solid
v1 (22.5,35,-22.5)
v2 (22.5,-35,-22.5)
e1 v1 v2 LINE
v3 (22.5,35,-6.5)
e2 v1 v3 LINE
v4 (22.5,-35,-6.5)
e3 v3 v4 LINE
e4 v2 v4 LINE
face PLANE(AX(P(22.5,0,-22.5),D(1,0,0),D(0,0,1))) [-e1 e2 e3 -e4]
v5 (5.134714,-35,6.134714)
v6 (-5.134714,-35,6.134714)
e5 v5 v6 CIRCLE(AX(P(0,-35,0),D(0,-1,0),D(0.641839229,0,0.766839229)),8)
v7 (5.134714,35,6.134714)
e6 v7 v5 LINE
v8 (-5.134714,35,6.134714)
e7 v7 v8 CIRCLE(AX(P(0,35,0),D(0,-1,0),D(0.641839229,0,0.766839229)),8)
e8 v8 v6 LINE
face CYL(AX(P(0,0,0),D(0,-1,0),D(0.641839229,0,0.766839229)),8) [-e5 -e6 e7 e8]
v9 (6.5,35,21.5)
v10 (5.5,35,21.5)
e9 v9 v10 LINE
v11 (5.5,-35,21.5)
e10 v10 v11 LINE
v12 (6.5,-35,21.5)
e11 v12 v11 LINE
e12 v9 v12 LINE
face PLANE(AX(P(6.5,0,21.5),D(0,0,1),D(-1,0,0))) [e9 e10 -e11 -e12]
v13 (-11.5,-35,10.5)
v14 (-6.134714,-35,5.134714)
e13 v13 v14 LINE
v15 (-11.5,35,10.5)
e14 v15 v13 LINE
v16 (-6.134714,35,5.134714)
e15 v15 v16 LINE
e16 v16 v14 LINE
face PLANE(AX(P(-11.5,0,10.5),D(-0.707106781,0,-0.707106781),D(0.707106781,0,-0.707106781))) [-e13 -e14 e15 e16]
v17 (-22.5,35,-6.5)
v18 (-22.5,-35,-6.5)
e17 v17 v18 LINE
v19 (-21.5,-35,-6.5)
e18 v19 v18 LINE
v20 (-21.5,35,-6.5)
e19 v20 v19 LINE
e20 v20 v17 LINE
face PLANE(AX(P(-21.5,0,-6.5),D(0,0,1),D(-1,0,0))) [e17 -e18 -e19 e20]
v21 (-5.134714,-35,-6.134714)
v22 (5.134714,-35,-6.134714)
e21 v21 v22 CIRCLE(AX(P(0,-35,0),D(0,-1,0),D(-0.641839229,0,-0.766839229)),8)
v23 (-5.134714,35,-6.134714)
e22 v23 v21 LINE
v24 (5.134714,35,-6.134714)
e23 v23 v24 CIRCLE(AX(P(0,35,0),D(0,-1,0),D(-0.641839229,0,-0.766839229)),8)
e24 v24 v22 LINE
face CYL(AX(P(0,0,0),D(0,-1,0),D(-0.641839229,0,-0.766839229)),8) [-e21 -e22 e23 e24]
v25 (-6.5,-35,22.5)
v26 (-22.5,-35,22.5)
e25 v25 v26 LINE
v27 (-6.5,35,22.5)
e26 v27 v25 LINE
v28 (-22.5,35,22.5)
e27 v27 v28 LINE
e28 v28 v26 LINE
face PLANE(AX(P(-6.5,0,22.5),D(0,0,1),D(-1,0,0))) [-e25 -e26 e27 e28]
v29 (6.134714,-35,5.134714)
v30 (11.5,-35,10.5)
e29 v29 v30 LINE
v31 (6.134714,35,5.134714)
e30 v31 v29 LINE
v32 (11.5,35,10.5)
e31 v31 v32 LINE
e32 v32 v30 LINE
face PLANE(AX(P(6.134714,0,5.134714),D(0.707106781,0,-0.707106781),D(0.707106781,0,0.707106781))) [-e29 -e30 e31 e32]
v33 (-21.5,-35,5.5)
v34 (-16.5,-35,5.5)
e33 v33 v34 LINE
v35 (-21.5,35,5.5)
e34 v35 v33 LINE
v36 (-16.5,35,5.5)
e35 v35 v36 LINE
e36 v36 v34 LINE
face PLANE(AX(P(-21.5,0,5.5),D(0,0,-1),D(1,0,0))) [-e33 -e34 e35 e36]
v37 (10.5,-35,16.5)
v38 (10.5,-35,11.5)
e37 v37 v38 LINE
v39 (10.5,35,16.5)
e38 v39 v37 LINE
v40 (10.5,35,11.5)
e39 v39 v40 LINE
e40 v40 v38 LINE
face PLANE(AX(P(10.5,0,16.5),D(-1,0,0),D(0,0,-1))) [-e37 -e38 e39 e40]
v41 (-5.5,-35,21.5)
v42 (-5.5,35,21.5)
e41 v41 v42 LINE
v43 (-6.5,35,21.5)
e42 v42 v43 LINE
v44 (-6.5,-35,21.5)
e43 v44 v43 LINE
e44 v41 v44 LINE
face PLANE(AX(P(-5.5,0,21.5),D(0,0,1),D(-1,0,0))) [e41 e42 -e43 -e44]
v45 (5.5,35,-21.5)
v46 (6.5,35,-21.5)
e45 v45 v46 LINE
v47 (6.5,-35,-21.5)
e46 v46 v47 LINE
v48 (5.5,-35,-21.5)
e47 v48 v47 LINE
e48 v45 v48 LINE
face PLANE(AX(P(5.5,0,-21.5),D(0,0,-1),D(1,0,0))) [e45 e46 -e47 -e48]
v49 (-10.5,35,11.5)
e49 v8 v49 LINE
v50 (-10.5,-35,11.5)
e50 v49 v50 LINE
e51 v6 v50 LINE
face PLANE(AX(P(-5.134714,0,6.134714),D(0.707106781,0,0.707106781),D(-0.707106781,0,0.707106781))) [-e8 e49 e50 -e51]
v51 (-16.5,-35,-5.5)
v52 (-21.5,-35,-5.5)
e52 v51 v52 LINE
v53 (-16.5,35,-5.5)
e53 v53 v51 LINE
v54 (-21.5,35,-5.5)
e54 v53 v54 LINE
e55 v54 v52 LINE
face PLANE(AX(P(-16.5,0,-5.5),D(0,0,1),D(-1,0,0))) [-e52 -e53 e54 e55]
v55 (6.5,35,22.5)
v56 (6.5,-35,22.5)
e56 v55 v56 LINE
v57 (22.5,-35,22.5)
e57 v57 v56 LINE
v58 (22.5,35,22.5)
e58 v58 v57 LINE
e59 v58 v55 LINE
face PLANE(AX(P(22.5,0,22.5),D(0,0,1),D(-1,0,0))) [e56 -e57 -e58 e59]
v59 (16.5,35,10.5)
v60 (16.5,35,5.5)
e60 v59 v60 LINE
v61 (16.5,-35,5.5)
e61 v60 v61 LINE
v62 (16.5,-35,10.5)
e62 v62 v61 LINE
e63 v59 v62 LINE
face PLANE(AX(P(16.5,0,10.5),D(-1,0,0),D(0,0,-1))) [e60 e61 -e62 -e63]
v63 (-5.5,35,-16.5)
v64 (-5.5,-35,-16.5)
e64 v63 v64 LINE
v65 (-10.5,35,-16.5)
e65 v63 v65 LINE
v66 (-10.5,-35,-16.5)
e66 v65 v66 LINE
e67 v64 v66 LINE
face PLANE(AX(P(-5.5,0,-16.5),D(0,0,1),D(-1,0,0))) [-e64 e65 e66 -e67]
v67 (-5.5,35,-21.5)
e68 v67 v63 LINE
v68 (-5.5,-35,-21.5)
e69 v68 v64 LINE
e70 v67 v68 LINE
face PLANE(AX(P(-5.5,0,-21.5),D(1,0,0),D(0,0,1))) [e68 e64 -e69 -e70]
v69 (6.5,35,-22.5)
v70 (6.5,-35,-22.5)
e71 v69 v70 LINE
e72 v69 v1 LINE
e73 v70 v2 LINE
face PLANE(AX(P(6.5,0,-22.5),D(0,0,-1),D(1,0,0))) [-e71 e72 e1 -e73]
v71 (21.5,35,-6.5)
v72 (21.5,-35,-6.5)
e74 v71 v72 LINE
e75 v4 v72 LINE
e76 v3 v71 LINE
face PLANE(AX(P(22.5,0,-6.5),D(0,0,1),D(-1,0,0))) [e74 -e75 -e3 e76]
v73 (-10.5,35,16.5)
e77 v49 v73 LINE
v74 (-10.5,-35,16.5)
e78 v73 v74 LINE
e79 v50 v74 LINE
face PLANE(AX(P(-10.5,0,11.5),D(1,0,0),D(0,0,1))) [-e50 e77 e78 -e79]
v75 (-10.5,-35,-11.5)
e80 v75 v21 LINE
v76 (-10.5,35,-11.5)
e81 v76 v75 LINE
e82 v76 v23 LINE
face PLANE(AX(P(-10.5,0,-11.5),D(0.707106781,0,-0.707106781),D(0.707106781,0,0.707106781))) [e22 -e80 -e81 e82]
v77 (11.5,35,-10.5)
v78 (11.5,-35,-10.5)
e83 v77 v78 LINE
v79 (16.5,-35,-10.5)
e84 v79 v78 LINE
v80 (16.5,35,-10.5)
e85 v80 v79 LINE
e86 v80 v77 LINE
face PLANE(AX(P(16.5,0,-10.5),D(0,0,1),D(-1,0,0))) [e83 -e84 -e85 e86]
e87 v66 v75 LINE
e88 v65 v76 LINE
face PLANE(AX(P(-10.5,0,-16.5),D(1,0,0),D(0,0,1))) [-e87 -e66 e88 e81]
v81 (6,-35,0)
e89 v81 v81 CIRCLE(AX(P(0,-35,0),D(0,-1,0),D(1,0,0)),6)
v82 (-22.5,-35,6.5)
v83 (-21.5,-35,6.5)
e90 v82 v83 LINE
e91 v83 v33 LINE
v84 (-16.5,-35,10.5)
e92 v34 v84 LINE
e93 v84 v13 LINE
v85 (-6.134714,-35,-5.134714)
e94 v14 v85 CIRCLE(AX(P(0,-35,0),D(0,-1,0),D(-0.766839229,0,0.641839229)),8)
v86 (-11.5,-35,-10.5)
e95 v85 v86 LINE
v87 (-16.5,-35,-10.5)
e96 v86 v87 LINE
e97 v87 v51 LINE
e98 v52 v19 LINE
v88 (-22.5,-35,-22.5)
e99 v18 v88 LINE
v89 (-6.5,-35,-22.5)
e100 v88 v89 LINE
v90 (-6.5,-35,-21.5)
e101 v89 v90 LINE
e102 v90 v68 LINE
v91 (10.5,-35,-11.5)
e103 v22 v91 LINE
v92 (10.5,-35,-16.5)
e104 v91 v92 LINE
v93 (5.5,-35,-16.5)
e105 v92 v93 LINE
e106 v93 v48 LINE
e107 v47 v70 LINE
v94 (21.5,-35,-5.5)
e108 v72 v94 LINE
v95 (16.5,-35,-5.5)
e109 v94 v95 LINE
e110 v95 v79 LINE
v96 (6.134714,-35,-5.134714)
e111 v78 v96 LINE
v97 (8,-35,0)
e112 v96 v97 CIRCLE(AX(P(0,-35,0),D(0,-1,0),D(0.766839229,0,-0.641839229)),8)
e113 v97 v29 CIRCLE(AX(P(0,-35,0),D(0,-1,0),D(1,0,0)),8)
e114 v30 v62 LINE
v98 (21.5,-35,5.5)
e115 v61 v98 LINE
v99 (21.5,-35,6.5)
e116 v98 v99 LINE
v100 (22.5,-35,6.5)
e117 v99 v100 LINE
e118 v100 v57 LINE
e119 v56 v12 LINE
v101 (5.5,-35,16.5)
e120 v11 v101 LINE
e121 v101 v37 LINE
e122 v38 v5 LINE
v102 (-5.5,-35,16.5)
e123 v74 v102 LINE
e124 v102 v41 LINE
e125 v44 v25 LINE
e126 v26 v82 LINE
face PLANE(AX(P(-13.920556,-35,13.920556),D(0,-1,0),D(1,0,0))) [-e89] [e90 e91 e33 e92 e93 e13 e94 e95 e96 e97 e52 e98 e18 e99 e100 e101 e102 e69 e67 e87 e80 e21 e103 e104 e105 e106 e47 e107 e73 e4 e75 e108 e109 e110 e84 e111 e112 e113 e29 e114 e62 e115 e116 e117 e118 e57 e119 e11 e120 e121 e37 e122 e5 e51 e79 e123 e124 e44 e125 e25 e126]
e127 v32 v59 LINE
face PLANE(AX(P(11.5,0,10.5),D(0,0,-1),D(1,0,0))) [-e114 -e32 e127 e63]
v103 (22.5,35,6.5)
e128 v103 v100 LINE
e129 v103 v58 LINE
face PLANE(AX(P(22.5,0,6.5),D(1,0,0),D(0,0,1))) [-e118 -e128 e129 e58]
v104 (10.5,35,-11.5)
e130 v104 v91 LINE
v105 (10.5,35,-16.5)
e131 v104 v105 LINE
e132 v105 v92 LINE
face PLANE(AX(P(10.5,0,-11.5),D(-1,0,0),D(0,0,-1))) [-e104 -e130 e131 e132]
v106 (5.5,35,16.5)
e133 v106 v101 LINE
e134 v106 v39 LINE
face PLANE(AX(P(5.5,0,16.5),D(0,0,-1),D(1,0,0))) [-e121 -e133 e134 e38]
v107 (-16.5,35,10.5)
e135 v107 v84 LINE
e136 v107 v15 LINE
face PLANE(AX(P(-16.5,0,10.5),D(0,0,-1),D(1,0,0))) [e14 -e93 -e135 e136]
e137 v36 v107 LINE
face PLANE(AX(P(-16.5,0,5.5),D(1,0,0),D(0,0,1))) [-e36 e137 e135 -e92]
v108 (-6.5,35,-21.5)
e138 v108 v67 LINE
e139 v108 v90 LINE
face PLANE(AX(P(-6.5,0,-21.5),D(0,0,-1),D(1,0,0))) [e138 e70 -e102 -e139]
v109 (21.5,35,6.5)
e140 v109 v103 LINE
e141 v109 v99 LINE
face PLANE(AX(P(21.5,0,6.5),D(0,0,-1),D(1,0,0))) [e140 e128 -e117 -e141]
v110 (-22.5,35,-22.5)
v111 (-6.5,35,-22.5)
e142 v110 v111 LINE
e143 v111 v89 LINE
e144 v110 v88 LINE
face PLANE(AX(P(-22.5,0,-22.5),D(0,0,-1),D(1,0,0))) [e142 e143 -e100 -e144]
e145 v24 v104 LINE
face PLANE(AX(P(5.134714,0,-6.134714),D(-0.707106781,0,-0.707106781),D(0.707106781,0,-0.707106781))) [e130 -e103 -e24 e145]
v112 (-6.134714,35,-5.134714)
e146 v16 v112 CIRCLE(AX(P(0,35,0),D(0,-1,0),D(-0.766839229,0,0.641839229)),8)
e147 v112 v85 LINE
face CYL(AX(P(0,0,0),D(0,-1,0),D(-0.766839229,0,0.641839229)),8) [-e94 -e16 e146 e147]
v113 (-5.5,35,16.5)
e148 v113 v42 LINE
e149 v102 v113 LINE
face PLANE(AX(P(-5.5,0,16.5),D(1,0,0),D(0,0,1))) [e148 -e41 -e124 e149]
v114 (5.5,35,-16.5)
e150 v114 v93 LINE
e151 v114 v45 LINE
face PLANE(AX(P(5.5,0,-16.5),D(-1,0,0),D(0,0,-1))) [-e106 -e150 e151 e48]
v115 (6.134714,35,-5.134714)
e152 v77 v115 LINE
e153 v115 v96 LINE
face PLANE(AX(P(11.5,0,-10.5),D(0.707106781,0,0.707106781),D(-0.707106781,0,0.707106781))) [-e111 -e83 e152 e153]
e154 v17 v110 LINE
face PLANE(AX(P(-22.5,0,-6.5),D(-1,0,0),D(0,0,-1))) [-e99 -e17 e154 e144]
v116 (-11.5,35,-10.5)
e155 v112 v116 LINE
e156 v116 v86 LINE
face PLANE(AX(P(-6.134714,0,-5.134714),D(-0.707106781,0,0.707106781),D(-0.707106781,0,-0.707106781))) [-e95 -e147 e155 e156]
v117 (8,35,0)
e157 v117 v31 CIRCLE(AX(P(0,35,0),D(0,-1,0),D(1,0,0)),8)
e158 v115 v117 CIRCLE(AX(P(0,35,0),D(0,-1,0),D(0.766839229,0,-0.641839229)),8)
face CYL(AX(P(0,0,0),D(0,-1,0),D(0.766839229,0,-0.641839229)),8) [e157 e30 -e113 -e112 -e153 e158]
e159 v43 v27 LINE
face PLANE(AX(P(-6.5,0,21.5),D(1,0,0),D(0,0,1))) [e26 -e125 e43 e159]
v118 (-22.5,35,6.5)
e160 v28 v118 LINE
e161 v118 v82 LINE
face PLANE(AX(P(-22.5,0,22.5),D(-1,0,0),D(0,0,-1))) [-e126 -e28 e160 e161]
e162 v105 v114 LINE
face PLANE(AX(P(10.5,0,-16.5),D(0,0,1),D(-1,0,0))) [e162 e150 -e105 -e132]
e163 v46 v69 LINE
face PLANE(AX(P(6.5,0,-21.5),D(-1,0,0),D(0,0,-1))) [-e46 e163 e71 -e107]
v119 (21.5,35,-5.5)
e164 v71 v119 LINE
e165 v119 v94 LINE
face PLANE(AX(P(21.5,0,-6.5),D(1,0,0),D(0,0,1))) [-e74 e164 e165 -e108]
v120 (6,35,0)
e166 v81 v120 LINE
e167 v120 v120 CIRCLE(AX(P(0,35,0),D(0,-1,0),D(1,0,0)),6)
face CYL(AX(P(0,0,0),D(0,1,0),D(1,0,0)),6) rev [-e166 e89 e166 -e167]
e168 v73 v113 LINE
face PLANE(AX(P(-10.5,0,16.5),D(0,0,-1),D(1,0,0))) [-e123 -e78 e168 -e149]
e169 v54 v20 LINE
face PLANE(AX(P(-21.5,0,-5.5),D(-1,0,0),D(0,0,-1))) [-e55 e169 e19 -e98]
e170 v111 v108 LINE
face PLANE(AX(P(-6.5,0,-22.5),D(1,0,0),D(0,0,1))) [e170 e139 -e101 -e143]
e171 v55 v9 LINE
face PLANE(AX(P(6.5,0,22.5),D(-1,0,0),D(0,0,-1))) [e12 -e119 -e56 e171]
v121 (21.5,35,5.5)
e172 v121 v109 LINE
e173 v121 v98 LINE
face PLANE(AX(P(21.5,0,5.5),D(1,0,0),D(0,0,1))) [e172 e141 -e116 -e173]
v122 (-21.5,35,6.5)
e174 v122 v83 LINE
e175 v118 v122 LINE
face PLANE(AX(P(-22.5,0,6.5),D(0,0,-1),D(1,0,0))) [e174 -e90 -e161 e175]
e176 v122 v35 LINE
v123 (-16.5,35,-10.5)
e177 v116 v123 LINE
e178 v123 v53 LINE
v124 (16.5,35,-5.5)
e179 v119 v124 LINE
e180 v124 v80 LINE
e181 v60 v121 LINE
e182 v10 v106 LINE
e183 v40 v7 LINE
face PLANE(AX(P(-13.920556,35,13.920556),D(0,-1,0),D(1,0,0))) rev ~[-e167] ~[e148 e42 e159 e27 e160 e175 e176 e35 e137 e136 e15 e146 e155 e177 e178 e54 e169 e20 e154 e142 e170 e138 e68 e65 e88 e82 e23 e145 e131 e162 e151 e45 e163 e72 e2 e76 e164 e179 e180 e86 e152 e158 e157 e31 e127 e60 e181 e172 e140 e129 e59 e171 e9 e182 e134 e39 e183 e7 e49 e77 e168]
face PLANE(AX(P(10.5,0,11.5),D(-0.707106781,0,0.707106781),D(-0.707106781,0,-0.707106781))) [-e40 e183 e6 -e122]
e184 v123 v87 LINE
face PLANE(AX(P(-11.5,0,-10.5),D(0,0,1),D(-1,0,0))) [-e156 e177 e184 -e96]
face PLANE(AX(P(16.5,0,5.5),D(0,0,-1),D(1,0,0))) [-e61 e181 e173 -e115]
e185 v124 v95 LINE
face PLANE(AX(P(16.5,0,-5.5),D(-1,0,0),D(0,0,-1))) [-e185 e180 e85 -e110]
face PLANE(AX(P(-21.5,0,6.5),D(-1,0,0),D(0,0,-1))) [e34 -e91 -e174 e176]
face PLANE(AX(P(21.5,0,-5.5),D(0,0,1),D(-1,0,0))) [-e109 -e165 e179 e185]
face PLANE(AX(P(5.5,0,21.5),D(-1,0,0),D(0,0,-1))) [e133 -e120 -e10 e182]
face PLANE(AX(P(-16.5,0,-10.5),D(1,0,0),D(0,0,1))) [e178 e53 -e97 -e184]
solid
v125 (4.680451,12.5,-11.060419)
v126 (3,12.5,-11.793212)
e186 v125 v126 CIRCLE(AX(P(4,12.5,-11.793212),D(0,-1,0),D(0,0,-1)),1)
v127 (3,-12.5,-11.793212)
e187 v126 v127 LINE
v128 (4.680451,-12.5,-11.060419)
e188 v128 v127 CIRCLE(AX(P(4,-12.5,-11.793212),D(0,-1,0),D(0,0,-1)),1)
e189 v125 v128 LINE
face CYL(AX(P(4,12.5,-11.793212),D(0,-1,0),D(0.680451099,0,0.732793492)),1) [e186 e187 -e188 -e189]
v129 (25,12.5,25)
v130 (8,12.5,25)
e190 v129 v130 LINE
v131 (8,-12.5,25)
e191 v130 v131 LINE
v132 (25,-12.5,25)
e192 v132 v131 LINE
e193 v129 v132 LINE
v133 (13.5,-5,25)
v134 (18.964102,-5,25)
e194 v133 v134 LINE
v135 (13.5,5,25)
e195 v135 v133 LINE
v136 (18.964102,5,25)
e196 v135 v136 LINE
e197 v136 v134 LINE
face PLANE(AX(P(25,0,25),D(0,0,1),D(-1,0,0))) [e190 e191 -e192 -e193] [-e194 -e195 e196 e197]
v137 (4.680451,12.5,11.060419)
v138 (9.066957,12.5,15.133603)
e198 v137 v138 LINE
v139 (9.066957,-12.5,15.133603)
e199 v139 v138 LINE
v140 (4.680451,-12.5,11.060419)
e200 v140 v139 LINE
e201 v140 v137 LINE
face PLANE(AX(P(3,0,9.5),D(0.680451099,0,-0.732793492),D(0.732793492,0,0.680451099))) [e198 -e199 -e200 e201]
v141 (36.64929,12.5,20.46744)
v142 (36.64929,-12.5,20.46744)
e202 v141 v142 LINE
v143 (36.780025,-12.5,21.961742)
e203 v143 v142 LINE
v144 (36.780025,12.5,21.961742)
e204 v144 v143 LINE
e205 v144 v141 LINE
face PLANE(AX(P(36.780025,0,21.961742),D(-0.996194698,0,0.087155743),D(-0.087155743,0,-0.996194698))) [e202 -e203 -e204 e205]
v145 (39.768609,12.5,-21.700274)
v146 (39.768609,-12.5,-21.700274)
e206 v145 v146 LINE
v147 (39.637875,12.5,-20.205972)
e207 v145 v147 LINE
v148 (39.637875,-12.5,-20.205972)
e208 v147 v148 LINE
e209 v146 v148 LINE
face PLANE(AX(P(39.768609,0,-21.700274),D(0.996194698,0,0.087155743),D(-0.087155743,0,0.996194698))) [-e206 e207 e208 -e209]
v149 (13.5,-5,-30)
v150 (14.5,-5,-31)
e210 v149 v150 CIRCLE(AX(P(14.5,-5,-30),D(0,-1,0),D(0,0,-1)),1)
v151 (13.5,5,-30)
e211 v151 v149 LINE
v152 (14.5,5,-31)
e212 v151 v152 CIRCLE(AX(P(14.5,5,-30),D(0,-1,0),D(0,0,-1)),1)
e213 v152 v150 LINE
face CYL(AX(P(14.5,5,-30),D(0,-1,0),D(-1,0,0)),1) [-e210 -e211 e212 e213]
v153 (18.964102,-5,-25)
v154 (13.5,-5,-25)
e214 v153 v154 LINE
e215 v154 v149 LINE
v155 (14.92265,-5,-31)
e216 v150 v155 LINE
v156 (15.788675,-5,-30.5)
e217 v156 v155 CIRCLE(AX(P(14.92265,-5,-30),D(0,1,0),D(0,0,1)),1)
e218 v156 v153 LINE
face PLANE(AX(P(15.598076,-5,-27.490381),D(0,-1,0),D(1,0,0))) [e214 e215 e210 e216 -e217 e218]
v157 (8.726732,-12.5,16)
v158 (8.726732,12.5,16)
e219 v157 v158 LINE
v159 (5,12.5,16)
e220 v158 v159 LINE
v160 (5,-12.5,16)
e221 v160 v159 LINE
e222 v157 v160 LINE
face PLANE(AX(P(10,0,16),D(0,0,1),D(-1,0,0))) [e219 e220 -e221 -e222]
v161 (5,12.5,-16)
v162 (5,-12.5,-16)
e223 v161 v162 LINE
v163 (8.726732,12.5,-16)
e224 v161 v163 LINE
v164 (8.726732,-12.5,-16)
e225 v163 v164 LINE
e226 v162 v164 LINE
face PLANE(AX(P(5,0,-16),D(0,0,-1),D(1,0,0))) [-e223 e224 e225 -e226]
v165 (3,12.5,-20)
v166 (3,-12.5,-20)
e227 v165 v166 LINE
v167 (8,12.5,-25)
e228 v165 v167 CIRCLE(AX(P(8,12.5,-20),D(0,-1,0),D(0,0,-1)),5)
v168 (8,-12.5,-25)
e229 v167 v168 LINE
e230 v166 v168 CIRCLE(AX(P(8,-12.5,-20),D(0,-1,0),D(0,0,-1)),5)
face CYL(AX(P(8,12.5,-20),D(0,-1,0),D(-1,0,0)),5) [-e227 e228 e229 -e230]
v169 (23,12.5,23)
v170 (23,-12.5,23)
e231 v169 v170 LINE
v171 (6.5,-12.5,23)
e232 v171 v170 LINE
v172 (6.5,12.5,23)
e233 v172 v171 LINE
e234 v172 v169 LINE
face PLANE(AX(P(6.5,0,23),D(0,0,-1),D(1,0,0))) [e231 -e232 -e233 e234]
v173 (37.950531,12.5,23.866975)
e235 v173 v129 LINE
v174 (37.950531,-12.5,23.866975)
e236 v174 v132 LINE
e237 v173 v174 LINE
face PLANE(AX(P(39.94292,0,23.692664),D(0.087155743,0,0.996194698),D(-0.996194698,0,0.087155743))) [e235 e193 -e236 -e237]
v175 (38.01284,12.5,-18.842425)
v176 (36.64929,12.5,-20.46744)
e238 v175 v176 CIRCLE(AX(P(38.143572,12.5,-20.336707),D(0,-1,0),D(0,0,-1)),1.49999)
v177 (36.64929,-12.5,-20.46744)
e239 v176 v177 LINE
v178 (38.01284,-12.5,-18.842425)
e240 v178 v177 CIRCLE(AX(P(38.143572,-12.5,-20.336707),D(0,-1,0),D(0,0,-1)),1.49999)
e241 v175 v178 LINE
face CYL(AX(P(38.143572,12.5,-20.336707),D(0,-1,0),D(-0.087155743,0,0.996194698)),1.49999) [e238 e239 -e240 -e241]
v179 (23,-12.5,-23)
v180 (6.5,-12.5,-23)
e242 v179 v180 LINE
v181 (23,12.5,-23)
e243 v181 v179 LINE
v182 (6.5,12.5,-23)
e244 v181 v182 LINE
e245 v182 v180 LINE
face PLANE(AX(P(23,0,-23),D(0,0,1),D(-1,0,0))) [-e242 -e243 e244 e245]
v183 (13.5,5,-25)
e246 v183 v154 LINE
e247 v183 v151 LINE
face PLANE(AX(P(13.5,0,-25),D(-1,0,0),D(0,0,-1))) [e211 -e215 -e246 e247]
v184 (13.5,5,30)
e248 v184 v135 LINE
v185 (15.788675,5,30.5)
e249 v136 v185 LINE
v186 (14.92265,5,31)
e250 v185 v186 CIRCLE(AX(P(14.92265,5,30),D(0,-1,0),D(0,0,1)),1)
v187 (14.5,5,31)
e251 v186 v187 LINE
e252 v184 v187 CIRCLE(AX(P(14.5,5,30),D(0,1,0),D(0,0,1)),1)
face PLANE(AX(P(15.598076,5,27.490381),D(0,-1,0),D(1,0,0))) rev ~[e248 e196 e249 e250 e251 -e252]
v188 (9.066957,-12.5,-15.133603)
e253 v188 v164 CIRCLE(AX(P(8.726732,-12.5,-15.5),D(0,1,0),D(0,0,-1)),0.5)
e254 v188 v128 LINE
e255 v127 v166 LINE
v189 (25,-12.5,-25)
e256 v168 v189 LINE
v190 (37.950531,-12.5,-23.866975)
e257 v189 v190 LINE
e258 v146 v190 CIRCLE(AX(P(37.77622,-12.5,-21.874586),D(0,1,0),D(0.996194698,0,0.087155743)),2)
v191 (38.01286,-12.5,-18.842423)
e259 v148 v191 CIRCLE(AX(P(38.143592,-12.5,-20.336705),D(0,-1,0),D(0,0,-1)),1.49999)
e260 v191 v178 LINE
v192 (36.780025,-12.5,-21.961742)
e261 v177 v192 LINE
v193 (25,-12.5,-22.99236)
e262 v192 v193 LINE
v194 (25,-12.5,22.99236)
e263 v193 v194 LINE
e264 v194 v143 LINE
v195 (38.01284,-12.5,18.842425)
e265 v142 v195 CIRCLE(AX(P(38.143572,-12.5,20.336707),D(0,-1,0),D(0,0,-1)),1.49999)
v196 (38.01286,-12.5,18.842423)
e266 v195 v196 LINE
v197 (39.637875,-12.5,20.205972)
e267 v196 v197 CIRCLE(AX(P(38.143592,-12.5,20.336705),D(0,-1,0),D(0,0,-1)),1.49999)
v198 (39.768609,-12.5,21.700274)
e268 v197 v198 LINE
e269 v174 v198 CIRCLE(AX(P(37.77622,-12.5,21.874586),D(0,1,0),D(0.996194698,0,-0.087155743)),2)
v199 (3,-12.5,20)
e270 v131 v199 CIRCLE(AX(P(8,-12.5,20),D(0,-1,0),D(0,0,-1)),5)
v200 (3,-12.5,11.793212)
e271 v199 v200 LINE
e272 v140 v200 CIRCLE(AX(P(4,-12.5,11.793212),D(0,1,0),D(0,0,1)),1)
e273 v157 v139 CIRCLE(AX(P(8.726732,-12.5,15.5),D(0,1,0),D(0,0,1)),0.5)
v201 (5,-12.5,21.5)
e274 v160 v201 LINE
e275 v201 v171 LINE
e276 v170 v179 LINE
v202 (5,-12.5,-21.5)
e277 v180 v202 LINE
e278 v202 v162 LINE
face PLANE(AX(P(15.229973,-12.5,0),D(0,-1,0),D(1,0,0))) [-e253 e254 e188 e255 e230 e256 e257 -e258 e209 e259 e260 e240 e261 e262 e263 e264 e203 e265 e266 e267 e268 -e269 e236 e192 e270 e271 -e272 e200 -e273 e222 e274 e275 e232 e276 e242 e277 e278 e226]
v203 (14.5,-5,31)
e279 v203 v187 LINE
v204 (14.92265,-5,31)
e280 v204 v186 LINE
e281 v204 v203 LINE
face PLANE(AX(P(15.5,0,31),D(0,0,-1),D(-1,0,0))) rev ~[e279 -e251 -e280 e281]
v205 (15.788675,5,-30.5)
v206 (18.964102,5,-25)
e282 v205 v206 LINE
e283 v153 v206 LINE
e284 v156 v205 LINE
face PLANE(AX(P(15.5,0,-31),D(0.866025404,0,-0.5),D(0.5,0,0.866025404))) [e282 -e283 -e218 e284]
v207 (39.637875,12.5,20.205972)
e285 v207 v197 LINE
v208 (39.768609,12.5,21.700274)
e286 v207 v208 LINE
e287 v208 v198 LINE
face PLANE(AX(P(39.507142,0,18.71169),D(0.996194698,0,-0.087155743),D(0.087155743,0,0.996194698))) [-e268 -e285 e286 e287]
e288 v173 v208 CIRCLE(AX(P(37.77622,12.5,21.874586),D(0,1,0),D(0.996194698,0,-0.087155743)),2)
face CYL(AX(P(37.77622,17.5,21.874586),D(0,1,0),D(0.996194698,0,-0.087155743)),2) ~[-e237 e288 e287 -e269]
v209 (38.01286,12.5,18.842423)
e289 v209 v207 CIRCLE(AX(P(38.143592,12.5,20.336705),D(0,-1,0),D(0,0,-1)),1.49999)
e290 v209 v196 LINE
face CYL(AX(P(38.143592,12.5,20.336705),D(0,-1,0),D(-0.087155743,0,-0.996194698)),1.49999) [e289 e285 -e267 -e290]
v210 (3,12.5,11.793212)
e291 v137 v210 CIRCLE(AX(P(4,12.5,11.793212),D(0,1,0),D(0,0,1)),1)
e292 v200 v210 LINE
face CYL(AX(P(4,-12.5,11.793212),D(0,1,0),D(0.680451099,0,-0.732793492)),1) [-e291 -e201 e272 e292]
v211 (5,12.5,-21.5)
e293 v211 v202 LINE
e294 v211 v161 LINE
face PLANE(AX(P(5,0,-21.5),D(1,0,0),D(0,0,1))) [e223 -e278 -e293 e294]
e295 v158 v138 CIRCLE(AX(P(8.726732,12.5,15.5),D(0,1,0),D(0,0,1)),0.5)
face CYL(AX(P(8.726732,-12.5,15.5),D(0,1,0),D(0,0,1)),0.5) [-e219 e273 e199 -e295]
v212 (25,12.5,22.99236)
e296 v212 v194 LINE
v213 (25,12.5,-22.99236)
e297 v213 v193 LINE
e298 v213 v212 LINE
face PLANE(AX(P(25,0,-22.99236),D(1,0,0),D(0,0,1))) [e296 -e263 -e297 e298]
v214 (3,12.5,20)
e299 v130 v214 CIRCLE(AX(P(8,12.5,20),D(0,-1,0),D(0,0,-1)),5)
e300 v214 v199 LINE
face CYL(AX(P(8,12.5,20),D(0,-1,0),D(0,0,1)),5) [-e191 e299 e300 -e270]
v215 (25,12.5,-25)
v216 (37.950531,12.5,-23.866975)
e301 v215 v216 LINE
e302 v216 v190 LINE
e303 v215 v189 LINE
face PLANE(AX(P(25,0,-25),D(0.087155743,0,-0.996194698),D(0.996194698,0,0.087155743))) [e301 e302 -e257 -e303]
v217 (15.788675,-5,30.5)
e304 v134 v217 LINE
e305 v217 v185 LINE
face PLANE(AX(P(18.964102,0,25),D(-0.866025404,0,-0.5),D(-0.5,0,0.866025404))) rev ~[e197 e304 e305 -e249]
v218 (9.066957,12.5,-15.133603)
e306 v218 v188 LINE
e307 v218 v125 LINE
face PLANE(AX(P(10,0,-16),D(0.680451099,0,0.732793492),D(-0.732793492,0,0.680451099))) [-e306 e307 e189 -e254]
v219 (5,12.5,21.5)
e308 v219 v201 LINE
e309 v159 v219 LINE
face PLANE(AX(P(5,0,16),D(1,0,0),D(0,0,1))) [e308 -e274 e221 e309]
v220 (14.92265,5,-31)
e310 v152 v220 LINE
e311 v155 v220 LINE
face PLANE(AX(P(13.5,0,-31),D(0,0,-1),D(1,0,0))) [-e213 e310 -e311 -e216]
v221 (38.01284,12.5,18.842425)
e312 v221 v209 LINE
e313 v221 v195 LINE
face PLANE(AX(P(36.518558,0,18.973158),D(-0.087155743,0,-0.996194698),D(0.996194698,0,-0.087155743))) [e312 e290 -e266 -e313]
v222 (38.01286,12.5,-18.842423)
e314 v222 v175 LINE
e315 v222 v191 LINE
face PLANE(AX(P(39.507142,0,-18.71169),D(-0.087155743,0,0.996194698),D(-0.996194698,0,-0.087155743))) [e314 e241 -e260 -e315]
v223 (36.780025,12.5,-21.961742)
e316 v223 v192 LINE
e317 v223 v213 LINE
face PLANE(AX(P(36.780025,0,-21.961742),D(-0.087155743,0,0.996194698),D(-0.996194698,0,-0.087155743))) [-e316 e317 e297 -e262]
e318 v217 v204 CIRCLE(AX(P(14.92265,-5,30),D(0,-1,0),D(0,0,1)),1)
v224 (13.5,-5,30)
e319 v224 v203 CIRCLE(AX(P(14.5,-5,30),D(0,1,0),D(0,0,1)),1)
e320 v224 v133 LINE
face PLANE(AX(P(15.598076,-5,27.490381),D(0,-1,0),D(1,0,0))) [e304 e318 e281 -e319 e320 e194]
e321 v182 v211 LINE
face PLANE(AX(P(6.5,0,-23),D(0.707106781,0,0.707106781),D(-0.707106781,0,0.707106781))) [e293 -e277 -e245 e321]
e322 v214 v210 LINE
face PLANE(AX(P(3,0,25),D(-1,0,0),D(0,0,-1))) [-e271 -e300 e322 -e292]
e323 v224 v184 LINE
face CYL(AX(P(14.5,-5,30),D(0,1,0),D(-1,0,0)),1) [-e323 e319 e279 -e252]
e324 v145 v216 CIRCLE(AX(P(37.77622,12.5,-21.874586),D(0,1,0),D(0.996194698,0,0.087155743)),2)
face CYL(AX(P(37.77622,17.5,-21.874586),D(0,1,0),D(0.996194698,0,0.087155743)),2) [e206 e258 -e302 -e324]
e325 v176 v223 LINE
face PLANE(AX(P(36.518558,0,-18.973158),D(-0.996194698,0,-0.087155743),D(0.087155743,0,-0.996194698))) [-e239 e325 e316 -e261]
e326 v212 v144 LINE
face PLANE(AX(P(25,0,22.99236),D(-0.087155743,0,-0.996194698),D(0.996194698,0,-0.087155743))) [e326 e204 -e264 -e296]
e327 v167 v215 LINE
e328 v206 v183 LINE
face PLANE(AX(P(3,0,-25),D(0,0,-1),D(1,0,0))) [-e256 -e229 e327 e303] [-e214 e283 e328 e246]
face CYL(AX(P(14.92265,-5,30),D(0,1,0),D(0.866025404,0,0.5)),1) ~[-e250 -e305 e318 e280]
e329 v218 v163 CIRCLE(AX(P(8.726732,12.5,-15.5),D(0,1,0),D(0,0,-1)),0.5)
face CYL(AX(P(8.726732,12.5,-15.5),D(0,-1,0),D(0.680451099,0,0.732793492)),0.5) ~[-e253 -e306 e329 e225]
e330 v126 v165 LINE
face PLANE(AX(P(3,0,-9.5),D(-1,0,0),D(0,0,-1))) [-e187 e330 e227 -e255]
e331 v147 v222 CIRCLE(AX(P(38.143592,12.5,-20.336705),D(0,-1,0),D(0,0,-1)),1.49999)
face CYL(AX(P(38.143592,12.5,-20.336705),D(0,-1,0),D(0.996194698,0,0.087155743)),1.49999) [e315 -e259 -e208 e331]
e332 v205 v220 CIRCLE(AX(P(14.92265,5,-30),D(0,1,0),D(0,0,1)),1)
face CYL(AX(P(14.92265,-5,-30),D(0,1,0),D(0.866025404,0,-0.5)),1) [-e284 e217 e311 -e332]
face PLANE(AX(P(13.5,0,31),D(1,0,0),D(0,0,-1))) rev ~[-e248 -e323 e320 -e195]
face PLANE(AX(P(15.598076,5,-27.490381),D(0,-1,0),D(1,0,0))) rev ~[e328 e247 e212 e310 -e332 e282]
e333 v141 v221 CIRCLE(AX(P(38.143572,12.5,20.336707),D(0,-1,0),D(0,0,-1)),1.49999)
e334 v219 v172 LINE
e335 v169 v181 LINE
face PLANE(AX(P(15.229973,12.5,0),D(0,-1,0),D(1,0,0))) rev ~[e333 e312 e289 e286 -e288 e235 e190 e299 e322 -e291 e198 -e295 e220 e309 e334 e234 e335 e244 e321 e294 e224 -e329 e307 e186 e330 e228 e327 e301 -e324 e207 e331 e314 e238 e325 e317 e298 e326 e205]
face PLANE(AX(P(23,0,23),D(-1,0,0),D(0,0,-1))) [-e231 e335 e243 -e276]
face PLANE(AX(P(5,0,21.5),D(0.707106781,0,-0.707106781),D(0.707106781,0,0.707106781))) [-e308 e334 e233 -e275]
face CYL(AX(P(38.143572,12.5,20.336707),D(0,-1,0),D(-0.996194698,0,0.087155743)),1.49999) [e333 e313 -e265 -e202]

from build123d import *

# Parameters (mm, degrees)
F0_R         = 6
F1_DEPTH     = 35
F3_DEPTH     = 12.5
F4_DEPTH     = 5
F5_R         = 5
F6_R         = 0.5
F7_R         = 1
F8_R         = 1
F9_R         = 1.49999
F10_T1_DEPTH = 35


# Not quite as in the source:
# - a fillet or chamfer that OpenCascade refuses, or shapes differently, is made with other operations: its cross-section is extruded or revolved along the edge and cut away or added
# - a fillet or chamfer is up to 0.001 mm smaller than in the source, because OpenCascade refuses the exact size


with BuildPart() as f1:
    # F0 (on Front) → F1 (new body, symmetric)
    with BuildSketch(Plane.XZ):
        with BuildLine():
            Line((-6.5, 21.5), (-6.5, 22.5))
            Line((-6.5, 22.5), (-22.5, 22.5))
            Line((-22.5, 22.5), (-22.5, 6.5))
            Line((-22.5, 6.5), (-21.5, 6.5))
            Line((-21.5, 6.5), (-21.5, 5.5))
            Line((-21.5, 5.5), (-16.5, 5.5))
            Line((-16.5, 5.5), (-16.5, 10.5))
            Line((-16.5, 10.5), (-11.5, 10.5))
            Line((-11.5, 10.5), (-6.1347138348, 5.1347138348))
            ThreePointArc((-6.1347138348, 5.1347138348), (-5.6568542495, 5.6568542495), (-5.1347138348, 6.1347138348))
            Line((-5.1347138348, 6.1347138348), (-10.5, 11.5))
            Line((-10.5, 11.5), (-10.5, 16.5))
            Line((-10.5, 16.5), (-5.5, 16.5))
            Line((-5.5, 16.5), (-5.5, 21.5))
            Line((-5.5, 21.5), (-6.5, 21.5))
        make_face()
        with BuildLine():
            ThreePointArc((5.1347138348, 6.1347138348), (0, 8), (-5.1347138348, 6.1347138348))
            ThreePointArc((-5.1347138348, 6.1347138348), (-5.6568542495, 5.6568542495), (-6.1347138348, 5.1347138348))
            ThreePointArc((-6.1347138348, 5.1347138348), (-8, 0), (-6.1347138348, -5.1347138348))
            ThreePointArc((-6.1347138348, -5.1347138348), (-5.6568542495, -5.6568542495), (-5.1347138348, -6.1347138348))
            ThreePointArc((-5.1347138348, -6.1347138348), (0, -8), (5.1347138348, -6.1347138348))
            ThreePointArc((5.1347138348, -6.1347138348), (5.6568542495, -5.6568542495), (6.1347138348, -5.1347138348))
            ThreePointArc((6.1347138348, -5.1347138348), (7.5192323637, -2.7315095938), (8, 0))
            ThreePointArc((8, 0), (7.5192323637, 2.7315095938), (6.1347138348, 5.1347138348))
            ThreePointArc((6.1347138348, 5.1347138348), (5.6568542495, 5.6568542495), (5.1347138348, 6.1347138348))
        make_face()
        Circle(F0_R, mode=Mode.SUBTRACT)
        with BuildLine():
            Line((10.5, 11.5), (5.1347138348, 6.1347138348))
            ThreePointArc((5.1347138348, 6.1347138348), (5.6568542495, 5.6568542495), (6.1347138348, 5.1347138348))
            Line((6.1347138348, 5.1347138348), (11.5, 10.5))
            Line((11.5, 10.5), (16.5, 10.5))
            Line((16.5, 10.5), (16.5, 5.5))
            Line((16.5, 5.5), (21.5, 5.5))
            Line((21.5, 5.5), (21.5, 6.5))
            Line((21.5, 6.5), (22.5, 6.5))
            Line((22.5, 6.5), (22.5, 22.5))
            Line((22.5, 22.5), (6.5, 22.5))
            Line((6.5, 22.5), (6.5, 21.5))
            Line((6.5, 21.5), (5.5, 21.5))
            Line((5.5, 21.5), (5.5, 16.5))
            Line((5.5, 16.5), (10.5, 16.5))
            Line((10.5, 16.5), (10.5, 11.5))
        make_face()
        with BuildLine():
            ThreePointArc((-5.1347138348, -6.1347138348), (-5.6568542495, -5.6568542495), (-6.1347138348, -5.1347138348))
            Line((-6.1347138348, -5.1347138348), (-11.5, -10.5))
            Line((-11.5, -10.5), (-16.5, -10.5))
            Line((-16.5, -10.5), (-16.5, -5.5))
            Line((-16.5, -5.5), (-21.5, -5.5))
            Line((-21.5, -5.5), (-21.5, -6.5))
            Line((-21.5, -6.5), (-22.5, -6.5))
            Line((-22.5, -6.5), (-22.5, -22.5))
            Line((-22.5, -22.5), (-6.5, -22.5))
            Line((-6.5, -22.5), (-6.5, -21.5))
            Line((-6.5, -21.5), (-5.5, -21.5))
            Line((-5.5, -21.5), (-5.5, -16.5))
            Line((-5.5, -16.5), (-10.5, -16.5))
            Line((-10.5, -16.5), (-10.5, -11.5))
            Line((-10.5, -11.5), (-5.1347138348, -6.1347138348))
        make_face()
        with BuildLine():
            Line((11.5, -10.5), (6.1347138348, -5.1347138348))
            ThreePointArc((6.1347138348, -5.1347138348), (5.6568542495, -5.6568542495), (5.1347138348, -6.1347138348))
            Line((5.1347138348, -6.1347138348), (10.5, -11.5))
            Line((10.5, -11.5), (10.5, -16.5))
            Line((10.5, -16.5), (5.5, -16.5))
            Line((5.5, -16.5), (5.5, -21.5))
            Line((5.5, -21.5), (6.5, -21.5))
            Line((6.5, -21.5), (6.5, -22.5))
            Line((6.5, -22.5), (22.5, -22.5))
            Line((22.5, -22.5), (22.5, -6.5))
            Line((22.5, -6.5), (21.5, -6.5))
            Line((21.5, -6.5), (21.5, -5.5))
            Line((21.5, -5.5), (16.5, -5.5))
            Line((16.5, -5.5), (16.5, -10.5))
            Line((16.5, -10.5), (11.5, -10.5))
        make_face()
    extrude(amount=F1_DEPTH, both=True)


with BuildPart() as f3:
    # F2 (on Front) → F3 (new body, symmetric)
    with BuildSketch(Plane.XZ):
        Polygon((5, 16), (5, 21.5), (6.5, 23), (23, 23), (23, 0), (23, -23), (6.5, -23), (5, -21.5), (5, -16), (10, -16), (3, -9.5), (3, -21.5), (3, -25), (6.5, -25), (13.5, -25), (18.9641016151, -25), (22.5, -25), (25, -25), (25, -22.9923603249), (25, -22.5), (25, 0), (25, 22.5), (25, 22.9923603249), (25, 25), (22.5, 25), (18.9641016151, 25), (15.5, 25), (14.5, 25), (13.5, 25), (6.5, 25), (3, 25), (3, 21.5), (3, 9.5), (10, 16), align=None)
        Polygon((39.9429204714, 23.6926638588), (25, 25), (25, 22.9923603249), (36.7800248916, 21.9617416908), (39.7686089859, 21.7002744626), align=None)
        Polygon((39.7686089859, 21.7002744626), (36.7800248916, 21.9617416908), (36.5185576634, 18.9731575966), (39.5071417576, 18.7116903683), align=None)
        Polygon((25, -22.9923603249), (25, -25), (39.9429204714, -23.6926638588), (39.7686089859, -21.7002744626), (36.7800248916, -21.9617416908), align=None)
        Polygon((36.5185576634, -18.9731575966), (36.7800248916, -21.9617416908), (39.7686089859, -21.7002744626), (39.5071417576, -18.7116903683), align=None)
    extrude(amount=F3_DEPTH, both=True)

    # F2 (on Front) → F4 (join, symmetric)
    with BuildSketch(Plane.XZ):
        Polygon((13.5, 31), (13.5, 25), (14.5, 25), (15.5, 25), (18.9641016151, 25), (15.5, 31), align=None)
        Polygon((18.9641016151, -25), (13.5, -25), (13.5, -31), (15.5, -31), align=None)
    extrude(amount=F4_DEPTH, both=True)

    # F5
    f5_edges = [f3.edges().sort_by_distance(p)[0] for p in [
        (3, 0, 25),
        (3, 0, -25),
    ]]
    fillet(f5_edges, radius=F5_R)

    # F6
    f6_edges = [f3.edges().sort_by_distance(p)[0] for p in [
        (10, 0, 16),
        (10, 0, -16),
    ]]
    fillet(f6_edges, radius=F6_R)

    # F7
    f7_edges = [f3.edges().sort_by_distance(p)[0] for p in [
        (3, 0, 9.5),
        (3, 0, -9.5),
    ]]
    fillet(f7_edges, radius=F7_R)

    # F8
    f8_edges = [f3.edges().sort_by_distance(p)[0] for p in [
        (13.5, 0, 31),
        (15.5, 0, 31),
        (15.5, 0, -31),
        (13.5, 0, -31),
    ]]
    fillet(f8_edges, radius=F8_R)

    # F9 (radius 1.5 in the source; OpenCascade refuses exactly that, so slightly less here)
    f9_edges = [f3.edges().sort_by_distance(p)[0] for p in [
        (39.507142, 0, 18.71169),
        (36.518558, 0, 18.973158),
        (39.507142, 0, -18.71169),
        (36.518558, 0, -18.973158),
    ]]
    fillet(f9_edges, radius=F9_R)

    # F10: fillet of radius 2 on 2 edges, made by hand

    # F10_s2 → F10_t1 (cut)
    with BuildSketch(Plane.XZ.offset(-17.5)):
        with BuildLine():
            ThreePointArc((39.7686089859, 21.7002744626), (39.3083084759, 23.1601611675), (37.9505310752, 23.8669753443))
            Line((37.9505310752, 23.8669753443), (39.9429204714, 23.6926638588))
            Line((39.9429204714, 23.6926638588), (39.7686089859, 21.7002744626))
        make_face()
        with BuildLine():
            ThreePointArc((39.7686089859, -21.7002744626), (39.3083084759, -23.1601611675), (37.9505310752, -23.8669753443))
            Line((37.9505310752, -23.8669753443), (39.9429204714, -23.6926638588))
            Line((39.9429204714, -23.6926638588), (39.7686089859, -21.7002744626))
        make_face()
    extrude(amount=F10_T1_DEPTH, mode=Mode.SUBTRACT)


solid = Compound([f1.part, f3.part])
